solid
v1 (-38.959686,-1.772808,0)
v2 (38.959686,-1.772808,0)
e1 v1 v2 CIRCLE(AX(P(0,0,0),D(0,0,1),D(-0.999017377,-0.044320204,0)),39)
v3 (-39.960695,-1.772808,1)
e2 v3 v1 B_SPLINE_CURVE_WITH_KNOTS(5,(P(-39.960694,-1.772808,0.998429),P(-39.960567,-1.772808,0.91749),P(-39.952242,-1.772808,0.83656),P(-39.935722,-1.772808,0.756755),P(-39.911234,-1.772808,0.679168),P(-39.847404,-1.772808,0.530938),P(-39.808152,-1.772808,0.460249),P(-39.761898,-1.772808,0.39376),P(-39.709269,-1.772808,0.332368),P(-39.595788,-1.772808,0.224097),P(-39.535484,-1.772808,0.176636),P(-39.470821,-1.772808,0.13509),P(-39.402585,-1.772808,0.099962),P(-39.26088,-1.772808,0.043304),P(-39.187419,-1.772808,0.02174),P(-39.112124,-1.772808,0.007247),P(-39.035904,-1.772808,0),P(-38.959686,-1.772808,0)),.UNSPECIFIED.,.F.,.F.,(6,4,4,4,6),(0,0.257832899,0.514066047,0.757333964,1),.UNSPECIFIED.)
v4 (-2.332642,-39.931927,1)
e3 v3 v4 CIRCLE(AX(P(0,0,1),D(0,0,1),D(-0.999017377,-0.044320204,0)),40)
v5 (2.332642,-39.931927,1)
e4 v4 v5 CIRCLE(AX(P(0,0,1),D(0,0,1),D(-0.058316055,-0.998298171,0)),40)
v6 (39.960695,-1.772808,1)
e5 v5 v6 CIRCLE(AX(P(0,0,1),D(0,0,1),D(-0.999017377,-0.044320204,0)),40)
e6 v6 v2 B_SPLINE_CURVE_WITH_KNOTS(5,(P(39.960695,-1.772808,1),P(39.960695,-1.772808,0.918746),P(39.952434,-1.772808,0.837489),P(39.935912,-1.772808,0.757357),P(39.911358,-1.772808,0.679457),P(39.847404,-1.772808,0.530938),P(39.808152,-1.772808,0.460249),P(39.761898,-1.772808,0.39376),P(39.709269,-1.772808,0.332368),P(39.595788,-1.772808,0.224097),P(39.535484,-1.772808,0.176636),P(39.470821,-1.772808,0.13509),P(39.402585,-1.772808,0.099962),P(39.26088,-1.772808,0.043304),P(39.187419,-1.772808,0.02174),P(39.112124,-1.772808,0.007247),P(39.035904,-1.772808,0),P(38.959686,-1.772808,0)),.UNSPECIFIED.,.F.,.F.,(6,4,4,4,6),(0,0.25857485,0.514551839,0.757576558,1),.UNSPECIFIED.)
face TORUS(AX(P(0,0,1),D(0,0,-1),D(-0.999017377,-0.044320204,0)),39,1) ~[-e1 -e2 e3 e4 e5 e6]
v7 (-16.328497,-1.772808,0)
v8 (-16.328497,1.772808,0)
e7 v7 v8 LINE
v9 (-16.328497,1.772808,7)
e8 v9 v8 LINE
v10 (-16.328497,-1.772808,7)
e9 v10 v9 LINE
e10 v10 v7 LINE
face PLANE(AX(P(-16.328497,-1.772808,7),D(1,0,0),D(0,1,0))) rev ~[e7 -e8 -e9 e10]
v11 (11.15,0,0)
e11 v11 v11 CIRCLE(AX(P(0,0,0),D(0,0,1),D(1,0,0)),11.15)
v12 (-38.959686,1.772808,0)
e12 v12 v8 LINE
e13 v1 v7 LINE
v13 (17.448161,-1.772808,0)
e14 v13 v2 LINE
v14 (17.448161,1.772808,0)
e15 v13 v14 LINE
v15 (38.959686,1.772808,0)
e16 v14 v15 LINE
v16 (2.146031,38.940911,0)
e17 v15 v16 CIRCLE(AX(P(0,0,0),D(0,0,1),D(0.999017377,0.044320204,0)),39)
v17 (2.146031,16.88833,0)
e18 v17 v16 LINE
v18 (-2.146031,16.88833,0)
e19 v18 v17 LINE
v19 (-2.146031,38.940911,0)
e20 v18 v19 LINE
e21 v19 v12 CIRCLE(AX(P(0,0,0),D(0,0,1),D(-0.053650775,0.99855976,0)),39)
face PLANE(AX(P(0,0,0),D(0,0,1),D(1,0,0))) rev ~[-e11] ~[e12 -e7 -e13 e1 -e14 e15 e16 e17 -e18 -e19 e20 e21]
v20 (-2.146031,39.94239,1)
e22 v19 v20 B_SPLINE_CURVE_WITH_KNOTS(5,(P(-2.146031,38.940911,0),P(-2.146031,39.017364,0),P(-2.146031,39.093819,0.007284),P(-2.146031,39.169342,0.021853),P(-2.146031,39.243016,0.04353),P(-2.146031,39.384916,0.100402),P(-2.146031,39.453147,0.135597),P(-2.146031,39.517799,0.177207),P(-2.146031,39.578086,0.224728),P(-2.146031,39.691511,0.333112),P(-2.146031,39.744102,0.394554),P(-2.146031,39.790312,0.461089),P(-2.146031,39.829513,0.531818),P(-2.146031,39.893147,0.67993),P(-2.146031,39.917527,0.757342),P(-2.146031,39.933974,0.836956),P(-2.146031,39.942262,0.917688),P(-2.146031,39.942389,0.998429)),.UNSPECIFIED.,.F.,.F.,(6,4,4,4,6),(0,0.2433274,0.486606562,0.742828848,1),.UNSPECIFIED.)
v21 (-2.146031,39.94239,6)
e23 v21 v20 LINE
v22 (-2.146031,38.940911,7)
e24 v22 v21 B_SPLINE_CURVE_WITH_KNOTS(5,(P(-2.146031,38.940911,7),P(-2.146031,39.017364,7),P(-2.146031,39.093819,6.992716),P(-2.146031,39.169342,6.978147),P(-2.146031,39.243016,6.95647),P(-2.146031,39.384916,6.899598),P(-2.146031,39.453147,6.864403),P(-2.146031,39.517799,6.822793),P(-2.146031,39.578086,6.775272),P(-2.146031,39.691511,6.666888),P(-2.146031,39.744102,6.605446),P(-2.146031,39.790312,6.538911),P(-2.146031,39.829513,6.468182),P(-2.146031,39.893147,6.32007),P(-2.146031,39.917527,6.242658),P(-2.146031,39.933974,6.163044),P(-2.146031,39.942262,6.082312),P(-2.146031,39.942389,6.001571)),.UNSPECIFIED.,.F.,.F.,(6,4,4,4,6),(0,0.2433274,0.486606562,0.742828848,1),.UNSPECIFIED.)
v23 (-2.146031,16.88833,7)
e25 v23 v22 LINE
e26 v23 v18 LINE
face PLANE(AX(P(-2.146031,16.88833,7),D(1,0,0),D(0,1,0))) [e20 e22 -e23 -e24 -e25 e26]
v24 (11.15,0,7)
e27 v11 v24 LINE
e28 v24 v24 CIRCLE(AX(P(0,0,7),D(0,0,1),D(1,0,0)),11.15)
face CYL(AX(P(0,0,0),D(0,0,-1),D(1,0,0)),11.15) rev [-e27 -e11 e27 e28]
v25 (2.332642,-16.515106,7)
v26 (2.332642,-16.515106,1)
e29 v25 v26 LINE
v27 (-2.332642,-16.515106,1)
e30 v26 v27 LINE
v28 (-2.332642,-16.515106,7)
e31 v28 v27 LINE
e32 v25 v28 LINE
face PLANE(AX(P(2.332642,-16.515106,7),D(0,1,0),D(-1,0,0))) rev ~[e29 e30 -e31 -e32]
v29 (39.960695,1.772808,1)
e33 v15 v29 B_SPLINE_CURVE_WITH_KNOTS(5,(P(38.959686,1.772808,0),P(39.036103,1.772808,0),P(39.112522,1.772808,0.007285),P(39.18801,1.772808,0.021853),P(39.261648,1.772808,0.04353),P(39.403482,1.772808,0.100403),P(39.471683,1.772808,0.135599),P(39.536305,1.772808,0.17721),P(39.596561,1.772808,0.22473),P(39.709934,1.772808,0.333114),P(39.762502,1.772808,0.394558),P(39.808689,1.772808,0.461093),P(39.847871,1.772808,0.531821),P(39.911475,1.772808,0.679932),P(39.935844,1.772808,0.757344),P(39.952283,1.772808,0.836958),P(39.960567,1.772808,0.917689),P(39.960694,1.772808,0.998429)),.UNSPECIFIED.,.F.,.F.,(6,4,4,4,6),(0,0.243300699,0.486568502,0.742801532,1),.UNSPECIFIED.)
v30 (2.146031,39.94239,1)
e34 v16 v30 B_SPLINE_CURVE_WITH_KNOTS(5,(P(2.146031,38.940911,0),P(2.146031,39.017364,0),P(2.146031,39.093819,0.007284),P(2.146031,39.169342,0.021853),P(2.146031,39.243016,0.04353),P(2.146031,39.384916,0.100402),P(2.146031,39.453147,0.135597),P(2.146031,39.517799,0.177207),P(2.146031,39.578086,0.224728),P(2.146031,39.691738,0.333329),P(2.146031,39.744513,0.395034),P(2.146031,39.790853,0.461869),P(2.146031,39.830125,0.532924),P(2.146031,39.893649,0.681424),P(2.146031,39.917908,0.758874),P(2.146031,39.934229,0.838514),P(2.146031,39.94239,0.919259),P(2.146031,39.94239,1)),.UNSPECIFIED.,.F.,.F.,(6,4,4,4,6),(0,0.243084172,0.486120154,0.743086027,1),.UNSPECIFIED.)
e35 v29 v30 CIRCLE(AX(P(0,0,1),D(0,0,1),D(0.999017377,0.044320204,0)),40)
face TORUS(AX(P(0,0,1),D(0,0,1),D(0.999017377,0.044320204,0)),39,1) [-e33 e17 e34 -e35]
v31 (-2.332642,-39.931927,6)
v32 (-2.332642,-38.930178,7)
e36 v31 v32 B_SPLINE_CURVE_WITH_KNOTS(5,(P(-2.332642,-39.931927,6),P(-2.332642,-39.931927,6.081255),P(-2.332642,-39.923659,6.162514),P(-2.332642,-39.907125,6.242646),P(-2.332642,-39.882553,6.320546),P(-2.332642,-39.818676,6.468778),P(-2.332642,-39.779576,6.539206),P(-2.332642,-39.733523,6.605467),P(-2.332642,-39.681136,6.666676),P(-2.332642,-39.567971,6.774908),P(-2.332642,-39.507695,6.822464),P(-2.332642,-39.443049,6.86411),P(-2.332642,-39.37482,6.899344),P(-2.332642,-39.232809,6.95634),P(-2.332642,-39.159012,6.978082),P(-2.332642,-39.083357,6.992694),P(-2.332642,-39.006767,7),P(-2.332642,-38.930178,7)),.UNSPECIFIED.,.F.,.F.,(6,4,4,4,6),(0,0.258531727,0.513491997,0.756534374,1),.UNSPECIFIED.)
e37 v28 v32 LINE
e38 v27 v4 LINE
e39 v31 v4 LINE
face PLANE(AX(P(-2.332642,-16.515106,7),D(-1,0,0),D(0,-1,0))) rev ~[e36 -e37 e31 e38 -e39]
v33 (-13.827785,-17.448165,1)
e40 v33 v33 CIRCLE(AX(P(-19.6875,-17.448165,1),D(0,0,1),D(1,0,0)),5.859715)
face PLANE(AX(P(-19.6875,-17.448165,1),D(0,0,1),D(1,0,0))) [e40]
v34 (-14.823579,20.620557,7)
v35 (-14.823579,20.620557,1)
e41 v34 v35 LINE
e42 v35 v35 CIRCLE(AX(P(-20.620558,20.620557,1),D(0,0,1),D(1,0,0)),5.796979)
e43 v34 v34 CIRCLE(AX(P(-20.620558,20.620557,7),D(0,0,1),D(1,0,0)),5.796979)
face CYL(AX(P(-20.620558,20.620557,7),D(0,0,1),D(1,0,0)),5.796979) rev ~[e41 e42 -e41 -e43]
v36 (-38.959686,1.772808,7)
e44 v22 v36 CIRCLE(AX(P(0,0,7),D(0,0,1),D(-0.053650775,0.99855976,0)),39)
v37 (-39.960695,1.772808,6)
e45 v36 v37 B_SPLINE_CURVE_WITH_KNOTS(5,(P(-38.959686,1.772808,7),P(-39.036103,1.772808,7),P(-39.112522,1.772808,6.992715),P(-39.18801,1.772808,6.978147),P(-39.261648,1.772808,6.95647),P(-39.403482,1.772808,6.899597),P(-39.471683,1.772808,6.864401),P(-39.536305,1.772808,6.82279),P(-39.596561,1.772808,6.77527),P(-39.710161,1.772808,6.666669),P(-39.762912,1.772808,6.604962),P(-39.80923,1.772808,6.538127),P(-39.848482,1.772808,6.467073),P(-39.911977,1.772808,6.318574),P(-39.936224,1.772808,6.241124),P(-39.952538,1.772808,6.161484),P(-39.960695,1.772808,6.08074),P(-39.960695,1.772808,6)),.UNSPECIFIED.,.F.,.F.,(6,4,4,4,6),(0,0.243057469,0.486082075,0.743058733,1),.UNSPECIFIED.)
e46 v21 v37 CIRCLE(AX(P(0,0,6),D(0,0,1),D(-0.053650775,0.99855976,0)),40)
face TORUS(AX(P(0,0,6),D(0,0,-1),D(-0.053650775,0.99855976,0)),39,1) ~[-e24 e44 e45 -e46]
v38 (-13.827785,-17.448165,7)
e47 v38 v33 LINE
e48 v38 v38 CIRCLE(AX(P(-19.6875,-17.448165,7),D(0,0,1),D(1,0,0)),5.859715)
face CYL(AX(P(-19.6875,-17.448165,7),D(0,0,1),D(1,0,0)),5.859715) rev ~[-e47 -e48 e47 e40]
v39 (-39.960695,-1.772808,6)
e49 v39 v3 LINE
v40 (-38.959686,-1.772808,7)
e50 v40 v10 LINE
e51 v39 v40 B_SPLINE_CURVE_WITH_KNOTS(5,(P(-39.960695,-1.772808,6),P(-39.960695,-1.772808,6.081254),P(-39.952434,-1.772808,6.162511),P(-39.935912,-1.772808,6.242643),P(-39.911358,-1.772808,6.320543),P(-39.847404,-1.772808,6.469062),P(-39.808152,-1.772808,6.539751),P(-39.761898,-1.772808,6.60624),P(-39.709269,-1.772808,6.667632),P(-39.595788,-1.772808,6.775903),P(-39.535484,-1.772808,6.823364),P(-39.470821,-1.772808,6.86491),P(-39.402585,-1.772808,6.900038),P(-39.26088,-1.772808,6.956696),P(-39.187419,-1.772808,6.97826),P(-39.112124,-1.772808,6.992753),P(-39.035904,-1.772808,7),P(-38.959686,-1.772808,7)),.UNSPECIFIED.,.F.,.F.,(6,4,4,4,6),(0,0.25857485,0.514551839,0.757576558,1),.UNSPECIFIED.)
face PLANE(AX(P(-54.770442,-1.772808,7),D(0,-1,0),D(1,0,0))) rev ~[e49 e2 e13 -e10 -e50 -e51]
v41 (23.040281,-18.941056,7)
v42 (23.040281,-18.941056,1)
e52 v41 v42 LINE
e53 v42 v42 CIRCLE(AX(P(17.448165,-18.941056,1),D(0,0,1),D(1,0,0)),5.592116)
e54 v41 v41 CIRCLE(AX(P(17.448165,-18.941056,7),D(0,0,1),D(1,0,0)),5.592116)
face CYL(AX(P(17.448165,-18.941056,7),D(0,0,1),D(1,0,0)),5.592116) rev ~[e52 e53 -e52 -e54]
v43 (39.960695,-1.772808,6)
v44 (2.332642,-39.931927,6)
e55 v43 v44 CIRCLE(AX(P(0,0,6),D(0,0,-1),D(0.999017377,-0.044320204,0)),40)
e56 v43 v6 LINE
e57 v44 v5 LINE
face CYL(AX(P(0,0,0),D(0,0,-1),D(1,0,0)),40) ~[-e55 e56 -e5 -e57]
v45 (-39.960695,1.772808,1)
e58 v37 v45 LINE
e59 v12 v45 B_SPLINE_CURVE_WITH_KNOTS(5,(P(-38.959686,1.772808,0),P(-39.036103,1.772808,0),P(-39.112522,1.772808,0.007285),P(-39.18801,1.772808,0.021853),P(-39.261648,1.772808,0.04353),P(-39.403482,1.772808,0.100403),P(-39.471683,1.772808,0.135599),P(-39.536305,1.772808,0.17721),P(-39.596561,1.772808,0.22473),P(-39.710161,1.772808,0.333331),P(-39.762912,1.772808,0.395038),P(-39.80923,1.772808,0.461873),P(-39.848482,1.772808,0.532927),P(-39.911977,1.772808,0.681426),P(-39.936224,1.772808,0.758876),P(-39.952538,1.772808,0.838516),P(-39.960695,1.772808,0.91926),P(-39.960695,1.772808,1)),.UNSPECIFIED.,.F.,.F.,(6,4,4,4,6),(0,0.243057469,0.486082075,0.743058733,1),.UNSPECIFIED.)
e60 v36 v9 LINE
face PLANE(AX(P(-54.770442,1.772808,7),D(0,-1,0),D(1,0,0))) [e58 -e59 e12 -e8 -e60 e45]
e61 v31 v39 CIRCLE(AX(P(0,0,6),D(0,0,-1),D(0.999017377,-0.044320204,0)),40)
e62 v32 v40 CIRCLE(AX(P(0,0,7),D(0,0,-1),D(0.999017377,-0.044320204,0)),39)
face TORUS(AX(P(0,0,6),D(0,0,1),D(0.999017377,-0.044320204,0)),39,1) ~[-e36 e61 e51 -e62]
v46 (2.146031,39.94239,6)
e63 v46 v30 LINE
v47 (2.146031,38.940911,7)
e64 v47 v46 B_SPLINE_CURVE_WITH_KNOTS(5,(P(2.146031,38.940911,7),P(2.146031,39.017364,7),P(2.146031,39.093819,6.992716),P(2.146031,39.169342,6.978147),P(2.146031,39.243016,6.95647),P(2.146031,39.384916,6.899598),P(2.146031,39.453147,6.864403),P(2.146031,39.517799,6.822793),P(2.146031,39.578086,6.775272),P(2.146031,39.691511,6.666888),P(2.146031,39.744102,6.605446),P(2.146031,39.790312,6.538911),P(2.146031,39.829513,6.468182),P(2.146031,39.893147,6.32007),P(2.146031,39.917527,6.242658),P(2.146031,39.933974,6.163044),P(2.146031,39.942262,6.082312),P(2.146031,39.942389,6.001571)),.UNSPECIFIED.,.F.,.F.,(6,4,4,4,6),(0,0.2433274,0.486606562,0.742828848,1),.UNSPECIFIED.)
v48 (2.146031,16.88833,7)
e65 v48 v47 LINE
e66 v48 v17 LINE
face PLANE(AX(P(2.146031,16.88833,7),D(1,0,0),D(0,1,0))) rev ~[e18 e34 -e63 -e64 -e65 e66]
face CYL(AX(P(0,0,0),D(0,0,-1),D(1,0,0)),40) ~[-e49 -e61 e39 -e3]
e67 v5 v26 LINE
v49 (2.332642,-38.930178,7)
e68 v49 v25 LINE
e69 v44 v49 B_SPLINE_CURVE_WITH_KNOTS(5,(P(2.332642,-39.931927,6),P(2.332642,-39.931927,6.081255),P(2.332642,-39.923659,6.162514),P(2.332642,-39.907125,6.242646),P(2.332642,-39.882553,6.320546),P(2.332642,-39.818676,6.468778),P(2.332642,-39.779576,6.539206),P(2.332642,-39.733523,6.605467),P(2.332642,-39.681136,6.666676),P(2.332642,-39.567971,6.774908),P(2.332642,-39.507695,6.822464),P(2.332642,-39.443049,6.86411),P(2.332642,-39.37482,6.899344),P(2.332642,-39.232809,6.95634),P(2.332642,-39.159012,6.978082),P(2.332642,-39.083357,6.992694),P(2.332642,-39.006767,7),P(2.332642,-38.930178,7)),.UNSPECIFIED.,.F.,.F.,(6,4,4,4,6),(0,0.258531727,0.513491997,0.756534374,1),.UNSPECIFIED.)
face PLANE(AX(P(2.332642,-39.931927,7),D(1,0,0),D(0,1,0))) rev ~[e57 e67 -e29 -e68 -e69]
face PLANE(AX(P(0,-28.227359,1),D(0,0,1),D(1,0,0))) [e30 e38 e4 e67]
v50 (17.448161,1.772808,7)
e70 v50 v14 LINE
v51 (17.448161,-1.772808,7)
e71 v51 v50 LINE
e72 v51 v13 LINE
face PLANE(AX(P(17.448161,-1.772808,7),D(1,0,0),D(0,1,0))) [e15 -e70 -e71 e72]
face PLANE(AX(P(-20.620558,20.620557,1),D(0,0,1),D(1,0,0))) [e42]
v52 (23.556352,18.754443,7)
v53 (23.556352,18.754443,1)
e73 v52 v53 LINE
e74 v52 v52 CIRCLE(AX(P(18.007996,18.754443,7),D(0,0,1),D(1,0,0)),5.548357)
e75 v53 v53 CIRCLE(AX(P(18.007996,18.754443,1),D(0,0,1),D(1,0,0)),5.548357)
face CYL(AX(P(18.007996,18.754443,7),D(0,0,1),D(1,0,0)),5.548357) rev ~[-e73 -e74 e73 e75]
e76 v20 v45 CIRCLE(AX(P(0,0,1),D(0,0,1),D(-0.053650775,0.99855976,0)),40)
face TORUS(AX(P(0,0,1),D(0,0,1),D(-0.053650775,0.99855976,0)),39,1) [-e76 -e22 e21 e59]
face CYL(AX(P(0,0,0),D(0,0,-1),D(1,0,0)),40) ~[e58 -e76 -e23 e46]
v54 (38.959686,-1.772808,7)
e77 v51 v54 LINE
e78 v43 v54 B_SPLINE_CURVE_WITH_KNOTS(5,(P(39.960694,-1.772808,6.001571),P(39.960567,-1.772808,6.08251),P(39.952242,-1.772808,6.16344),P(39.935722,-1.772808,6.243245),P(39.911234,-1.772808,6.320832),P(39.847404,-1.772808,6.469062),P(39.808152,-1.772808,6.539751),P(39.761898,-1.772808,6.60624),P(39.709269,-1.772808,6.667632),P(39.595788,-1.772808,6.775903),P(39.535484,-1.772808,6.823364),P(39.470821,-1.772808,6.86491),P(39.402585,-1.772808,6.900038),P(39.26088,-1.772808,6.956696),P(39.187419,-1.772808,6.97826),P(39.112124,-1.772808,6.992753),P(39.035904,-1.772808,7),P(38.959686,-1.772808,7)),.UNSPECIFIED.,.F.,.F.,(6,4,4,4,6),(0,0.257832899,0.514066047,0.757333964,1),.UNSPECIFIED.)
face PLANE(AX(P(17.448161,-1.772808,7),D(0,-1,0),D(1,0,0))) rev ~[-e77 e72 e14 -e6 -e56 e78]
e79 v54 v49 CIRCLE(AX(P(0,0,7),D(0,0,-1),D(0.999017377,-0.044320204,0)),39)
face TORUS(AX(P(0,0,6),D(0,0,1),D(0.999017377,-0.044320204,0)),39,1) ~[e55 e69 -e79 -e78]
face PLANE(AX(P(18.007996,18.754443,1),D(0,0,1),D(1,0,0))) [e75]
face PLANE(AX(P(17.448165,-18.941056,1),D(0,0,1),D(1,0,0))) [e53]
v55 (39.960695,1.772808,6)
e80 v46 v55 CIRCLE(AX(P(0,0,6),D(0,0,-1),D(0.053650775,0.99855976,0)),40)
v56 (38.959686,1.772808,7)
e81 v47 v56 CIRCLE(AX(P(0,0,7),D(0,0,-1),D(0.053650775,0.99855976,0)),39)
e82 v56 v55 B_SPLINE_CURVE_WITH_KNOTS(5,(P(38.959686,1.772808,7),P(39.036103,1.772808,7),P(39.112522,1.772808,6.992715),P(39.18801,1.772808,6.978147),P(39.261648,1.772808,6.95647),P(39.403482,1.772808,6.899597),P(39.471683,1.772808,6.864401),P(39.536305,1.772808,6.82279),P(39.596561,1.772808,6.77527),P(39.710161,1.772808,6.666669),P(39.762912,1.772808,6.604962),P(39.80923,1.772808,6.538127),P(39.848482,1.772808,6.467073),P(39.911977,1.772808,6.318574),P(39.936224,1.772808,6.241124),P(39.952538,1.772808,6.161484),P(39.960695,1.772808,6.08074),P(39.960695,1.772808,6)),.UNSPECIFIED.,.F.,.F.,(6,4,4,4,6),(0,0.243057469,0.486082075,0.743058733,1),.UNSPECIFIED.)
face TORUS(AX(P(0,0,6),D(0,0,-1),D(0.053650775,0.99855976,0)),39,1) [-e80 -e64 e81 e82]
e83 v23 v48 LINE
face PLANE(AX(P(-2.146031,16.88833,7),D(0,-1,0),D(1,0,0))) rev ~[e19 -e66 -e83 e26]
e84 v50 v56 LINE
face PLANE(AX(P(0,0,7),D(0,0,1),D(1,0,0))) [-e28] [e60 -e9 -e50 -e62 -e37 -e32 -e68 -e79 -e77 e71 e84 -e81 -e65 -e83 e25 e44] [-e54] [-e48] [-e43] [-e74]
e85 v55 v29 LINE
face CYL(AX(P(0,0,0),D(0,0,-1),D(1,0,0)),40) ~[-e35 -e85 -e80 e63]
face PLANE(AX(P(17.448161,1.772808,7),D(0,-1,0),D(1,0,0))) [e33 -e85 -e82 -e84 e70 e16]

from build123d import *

# Parameters (mm, degrees)
F0_R      = 40
F0_R_2    = 11.15
F1_DEPTH  = 7
F3_W      = 4.2920620181
F3_H      = 25.3791473806
F4_DEPTH  = 50
F5_W      = 38.4419448674
F5_H      = 3.5456162877
F6_DEPTH  = 25
F8_W      = 29.4845998287
F8_H      = 3.5456162877
F9_DEPTH  = 25
F12_R     = 1
F13_DEPTH = 6
F10_R     = 5.7969793016
F10_R_2   = 5.8597151437
F11_R     = 5.5483568343
F11_R_2   = 5.5921159978
F14_DEPTH = 6


with BuildPart() as f1:
    # F0 (on Top) → F1 (new body)
    with BuildSketch(Plane.XY):
        Circle(F0_R)
        Circle(F0_R_2, mode=Mode.SUBTRACT)
    extrude(amount=F1_DEPTH)

    # F3 (on face) → F4 (cut)
    with BuildSketch(Plane.XY.offset(7)):
        with Locations((0, 29.5779034495)):
            Rectangle(F3_W, F3_H)
    extrude(amount=-F4_DEPTH, mode=Mode.SUBTRACT)

    # F5 (on face) → F6 (cut)
    with BuildSketch(Plane.XY.offset(7)):
        with Locations((-35.5494692922, 0)):
            Rectangle(F5_W, F5_H)
    extrude(amount=-F6_DEPTH, mode=Mode.SUBTRACT)

    # F8 (on face) → F9 (cut)
    with BuildSketch(Plane.XY.offset(7)):
        with Locations((32.1904607117, 0)):
            Rectangle(F8_W, F8_H)
    extrude(amount=-F9_DEPTH, mode=Mode.SUBTRACT)

    # F12
    f12_edges = [f1.edges().sort_by_distance(p)[0] for p in [
        (-28.416076, 28.15185, 7),
        (-28.416076, 28.15185, 0),
        (0, -40, 0),
        (28.416076, 28.15185, 0),
        (0, -40, 7),
        (28.416076, 28.15185, 7),
    ]]
    fillet(f12_edges, radius=F12_R)

    # F7 (on face) → F13 (cut)
    with BuildSketch(Plane.XY.offset(7)):
        with BuildLine():
            ThreePointArc((-2.3326422088, -39.9319268296), (0, -40), (2.3326422088, -39.9319268296))
            Line((2.3326422088, -39.9319268296), (2.3326422088, -16.5151059628))
            Line((2.3326422088, -16.5151059628), (-2.3326422088, -16.5151059628))
            Line((-2.3326422088, -16.5151059628), (-2.3326422088, -39.9319268296))
        make_face()
    extrude(amount=-F13_DEPTH, mode=Mode.SUBTRACT)

    # F10 (on face) + F11 (on face) → F14 (cut)
    with BuildSketch(Plane.XY.offset(7)):
        with Locations((-20.6205584109, 20.6205565482)):
            Circle(F10_R)
        with Locations((-19.687499851, -17.4481645226)):
            Circle(F10_R_2)
    with BuildSketch(Plane.XY.offset(7)):
        with Locations((18.0079955608, 18.7544431537)):
            Circle(F11_R)
        with Locations((17.4481645226, -18.9410559833)):
            Circle(F11_R_2)
    extrude(amount=-F14_DEPTH, mode=Mode.SUBTRACT)


solid = f1.part
